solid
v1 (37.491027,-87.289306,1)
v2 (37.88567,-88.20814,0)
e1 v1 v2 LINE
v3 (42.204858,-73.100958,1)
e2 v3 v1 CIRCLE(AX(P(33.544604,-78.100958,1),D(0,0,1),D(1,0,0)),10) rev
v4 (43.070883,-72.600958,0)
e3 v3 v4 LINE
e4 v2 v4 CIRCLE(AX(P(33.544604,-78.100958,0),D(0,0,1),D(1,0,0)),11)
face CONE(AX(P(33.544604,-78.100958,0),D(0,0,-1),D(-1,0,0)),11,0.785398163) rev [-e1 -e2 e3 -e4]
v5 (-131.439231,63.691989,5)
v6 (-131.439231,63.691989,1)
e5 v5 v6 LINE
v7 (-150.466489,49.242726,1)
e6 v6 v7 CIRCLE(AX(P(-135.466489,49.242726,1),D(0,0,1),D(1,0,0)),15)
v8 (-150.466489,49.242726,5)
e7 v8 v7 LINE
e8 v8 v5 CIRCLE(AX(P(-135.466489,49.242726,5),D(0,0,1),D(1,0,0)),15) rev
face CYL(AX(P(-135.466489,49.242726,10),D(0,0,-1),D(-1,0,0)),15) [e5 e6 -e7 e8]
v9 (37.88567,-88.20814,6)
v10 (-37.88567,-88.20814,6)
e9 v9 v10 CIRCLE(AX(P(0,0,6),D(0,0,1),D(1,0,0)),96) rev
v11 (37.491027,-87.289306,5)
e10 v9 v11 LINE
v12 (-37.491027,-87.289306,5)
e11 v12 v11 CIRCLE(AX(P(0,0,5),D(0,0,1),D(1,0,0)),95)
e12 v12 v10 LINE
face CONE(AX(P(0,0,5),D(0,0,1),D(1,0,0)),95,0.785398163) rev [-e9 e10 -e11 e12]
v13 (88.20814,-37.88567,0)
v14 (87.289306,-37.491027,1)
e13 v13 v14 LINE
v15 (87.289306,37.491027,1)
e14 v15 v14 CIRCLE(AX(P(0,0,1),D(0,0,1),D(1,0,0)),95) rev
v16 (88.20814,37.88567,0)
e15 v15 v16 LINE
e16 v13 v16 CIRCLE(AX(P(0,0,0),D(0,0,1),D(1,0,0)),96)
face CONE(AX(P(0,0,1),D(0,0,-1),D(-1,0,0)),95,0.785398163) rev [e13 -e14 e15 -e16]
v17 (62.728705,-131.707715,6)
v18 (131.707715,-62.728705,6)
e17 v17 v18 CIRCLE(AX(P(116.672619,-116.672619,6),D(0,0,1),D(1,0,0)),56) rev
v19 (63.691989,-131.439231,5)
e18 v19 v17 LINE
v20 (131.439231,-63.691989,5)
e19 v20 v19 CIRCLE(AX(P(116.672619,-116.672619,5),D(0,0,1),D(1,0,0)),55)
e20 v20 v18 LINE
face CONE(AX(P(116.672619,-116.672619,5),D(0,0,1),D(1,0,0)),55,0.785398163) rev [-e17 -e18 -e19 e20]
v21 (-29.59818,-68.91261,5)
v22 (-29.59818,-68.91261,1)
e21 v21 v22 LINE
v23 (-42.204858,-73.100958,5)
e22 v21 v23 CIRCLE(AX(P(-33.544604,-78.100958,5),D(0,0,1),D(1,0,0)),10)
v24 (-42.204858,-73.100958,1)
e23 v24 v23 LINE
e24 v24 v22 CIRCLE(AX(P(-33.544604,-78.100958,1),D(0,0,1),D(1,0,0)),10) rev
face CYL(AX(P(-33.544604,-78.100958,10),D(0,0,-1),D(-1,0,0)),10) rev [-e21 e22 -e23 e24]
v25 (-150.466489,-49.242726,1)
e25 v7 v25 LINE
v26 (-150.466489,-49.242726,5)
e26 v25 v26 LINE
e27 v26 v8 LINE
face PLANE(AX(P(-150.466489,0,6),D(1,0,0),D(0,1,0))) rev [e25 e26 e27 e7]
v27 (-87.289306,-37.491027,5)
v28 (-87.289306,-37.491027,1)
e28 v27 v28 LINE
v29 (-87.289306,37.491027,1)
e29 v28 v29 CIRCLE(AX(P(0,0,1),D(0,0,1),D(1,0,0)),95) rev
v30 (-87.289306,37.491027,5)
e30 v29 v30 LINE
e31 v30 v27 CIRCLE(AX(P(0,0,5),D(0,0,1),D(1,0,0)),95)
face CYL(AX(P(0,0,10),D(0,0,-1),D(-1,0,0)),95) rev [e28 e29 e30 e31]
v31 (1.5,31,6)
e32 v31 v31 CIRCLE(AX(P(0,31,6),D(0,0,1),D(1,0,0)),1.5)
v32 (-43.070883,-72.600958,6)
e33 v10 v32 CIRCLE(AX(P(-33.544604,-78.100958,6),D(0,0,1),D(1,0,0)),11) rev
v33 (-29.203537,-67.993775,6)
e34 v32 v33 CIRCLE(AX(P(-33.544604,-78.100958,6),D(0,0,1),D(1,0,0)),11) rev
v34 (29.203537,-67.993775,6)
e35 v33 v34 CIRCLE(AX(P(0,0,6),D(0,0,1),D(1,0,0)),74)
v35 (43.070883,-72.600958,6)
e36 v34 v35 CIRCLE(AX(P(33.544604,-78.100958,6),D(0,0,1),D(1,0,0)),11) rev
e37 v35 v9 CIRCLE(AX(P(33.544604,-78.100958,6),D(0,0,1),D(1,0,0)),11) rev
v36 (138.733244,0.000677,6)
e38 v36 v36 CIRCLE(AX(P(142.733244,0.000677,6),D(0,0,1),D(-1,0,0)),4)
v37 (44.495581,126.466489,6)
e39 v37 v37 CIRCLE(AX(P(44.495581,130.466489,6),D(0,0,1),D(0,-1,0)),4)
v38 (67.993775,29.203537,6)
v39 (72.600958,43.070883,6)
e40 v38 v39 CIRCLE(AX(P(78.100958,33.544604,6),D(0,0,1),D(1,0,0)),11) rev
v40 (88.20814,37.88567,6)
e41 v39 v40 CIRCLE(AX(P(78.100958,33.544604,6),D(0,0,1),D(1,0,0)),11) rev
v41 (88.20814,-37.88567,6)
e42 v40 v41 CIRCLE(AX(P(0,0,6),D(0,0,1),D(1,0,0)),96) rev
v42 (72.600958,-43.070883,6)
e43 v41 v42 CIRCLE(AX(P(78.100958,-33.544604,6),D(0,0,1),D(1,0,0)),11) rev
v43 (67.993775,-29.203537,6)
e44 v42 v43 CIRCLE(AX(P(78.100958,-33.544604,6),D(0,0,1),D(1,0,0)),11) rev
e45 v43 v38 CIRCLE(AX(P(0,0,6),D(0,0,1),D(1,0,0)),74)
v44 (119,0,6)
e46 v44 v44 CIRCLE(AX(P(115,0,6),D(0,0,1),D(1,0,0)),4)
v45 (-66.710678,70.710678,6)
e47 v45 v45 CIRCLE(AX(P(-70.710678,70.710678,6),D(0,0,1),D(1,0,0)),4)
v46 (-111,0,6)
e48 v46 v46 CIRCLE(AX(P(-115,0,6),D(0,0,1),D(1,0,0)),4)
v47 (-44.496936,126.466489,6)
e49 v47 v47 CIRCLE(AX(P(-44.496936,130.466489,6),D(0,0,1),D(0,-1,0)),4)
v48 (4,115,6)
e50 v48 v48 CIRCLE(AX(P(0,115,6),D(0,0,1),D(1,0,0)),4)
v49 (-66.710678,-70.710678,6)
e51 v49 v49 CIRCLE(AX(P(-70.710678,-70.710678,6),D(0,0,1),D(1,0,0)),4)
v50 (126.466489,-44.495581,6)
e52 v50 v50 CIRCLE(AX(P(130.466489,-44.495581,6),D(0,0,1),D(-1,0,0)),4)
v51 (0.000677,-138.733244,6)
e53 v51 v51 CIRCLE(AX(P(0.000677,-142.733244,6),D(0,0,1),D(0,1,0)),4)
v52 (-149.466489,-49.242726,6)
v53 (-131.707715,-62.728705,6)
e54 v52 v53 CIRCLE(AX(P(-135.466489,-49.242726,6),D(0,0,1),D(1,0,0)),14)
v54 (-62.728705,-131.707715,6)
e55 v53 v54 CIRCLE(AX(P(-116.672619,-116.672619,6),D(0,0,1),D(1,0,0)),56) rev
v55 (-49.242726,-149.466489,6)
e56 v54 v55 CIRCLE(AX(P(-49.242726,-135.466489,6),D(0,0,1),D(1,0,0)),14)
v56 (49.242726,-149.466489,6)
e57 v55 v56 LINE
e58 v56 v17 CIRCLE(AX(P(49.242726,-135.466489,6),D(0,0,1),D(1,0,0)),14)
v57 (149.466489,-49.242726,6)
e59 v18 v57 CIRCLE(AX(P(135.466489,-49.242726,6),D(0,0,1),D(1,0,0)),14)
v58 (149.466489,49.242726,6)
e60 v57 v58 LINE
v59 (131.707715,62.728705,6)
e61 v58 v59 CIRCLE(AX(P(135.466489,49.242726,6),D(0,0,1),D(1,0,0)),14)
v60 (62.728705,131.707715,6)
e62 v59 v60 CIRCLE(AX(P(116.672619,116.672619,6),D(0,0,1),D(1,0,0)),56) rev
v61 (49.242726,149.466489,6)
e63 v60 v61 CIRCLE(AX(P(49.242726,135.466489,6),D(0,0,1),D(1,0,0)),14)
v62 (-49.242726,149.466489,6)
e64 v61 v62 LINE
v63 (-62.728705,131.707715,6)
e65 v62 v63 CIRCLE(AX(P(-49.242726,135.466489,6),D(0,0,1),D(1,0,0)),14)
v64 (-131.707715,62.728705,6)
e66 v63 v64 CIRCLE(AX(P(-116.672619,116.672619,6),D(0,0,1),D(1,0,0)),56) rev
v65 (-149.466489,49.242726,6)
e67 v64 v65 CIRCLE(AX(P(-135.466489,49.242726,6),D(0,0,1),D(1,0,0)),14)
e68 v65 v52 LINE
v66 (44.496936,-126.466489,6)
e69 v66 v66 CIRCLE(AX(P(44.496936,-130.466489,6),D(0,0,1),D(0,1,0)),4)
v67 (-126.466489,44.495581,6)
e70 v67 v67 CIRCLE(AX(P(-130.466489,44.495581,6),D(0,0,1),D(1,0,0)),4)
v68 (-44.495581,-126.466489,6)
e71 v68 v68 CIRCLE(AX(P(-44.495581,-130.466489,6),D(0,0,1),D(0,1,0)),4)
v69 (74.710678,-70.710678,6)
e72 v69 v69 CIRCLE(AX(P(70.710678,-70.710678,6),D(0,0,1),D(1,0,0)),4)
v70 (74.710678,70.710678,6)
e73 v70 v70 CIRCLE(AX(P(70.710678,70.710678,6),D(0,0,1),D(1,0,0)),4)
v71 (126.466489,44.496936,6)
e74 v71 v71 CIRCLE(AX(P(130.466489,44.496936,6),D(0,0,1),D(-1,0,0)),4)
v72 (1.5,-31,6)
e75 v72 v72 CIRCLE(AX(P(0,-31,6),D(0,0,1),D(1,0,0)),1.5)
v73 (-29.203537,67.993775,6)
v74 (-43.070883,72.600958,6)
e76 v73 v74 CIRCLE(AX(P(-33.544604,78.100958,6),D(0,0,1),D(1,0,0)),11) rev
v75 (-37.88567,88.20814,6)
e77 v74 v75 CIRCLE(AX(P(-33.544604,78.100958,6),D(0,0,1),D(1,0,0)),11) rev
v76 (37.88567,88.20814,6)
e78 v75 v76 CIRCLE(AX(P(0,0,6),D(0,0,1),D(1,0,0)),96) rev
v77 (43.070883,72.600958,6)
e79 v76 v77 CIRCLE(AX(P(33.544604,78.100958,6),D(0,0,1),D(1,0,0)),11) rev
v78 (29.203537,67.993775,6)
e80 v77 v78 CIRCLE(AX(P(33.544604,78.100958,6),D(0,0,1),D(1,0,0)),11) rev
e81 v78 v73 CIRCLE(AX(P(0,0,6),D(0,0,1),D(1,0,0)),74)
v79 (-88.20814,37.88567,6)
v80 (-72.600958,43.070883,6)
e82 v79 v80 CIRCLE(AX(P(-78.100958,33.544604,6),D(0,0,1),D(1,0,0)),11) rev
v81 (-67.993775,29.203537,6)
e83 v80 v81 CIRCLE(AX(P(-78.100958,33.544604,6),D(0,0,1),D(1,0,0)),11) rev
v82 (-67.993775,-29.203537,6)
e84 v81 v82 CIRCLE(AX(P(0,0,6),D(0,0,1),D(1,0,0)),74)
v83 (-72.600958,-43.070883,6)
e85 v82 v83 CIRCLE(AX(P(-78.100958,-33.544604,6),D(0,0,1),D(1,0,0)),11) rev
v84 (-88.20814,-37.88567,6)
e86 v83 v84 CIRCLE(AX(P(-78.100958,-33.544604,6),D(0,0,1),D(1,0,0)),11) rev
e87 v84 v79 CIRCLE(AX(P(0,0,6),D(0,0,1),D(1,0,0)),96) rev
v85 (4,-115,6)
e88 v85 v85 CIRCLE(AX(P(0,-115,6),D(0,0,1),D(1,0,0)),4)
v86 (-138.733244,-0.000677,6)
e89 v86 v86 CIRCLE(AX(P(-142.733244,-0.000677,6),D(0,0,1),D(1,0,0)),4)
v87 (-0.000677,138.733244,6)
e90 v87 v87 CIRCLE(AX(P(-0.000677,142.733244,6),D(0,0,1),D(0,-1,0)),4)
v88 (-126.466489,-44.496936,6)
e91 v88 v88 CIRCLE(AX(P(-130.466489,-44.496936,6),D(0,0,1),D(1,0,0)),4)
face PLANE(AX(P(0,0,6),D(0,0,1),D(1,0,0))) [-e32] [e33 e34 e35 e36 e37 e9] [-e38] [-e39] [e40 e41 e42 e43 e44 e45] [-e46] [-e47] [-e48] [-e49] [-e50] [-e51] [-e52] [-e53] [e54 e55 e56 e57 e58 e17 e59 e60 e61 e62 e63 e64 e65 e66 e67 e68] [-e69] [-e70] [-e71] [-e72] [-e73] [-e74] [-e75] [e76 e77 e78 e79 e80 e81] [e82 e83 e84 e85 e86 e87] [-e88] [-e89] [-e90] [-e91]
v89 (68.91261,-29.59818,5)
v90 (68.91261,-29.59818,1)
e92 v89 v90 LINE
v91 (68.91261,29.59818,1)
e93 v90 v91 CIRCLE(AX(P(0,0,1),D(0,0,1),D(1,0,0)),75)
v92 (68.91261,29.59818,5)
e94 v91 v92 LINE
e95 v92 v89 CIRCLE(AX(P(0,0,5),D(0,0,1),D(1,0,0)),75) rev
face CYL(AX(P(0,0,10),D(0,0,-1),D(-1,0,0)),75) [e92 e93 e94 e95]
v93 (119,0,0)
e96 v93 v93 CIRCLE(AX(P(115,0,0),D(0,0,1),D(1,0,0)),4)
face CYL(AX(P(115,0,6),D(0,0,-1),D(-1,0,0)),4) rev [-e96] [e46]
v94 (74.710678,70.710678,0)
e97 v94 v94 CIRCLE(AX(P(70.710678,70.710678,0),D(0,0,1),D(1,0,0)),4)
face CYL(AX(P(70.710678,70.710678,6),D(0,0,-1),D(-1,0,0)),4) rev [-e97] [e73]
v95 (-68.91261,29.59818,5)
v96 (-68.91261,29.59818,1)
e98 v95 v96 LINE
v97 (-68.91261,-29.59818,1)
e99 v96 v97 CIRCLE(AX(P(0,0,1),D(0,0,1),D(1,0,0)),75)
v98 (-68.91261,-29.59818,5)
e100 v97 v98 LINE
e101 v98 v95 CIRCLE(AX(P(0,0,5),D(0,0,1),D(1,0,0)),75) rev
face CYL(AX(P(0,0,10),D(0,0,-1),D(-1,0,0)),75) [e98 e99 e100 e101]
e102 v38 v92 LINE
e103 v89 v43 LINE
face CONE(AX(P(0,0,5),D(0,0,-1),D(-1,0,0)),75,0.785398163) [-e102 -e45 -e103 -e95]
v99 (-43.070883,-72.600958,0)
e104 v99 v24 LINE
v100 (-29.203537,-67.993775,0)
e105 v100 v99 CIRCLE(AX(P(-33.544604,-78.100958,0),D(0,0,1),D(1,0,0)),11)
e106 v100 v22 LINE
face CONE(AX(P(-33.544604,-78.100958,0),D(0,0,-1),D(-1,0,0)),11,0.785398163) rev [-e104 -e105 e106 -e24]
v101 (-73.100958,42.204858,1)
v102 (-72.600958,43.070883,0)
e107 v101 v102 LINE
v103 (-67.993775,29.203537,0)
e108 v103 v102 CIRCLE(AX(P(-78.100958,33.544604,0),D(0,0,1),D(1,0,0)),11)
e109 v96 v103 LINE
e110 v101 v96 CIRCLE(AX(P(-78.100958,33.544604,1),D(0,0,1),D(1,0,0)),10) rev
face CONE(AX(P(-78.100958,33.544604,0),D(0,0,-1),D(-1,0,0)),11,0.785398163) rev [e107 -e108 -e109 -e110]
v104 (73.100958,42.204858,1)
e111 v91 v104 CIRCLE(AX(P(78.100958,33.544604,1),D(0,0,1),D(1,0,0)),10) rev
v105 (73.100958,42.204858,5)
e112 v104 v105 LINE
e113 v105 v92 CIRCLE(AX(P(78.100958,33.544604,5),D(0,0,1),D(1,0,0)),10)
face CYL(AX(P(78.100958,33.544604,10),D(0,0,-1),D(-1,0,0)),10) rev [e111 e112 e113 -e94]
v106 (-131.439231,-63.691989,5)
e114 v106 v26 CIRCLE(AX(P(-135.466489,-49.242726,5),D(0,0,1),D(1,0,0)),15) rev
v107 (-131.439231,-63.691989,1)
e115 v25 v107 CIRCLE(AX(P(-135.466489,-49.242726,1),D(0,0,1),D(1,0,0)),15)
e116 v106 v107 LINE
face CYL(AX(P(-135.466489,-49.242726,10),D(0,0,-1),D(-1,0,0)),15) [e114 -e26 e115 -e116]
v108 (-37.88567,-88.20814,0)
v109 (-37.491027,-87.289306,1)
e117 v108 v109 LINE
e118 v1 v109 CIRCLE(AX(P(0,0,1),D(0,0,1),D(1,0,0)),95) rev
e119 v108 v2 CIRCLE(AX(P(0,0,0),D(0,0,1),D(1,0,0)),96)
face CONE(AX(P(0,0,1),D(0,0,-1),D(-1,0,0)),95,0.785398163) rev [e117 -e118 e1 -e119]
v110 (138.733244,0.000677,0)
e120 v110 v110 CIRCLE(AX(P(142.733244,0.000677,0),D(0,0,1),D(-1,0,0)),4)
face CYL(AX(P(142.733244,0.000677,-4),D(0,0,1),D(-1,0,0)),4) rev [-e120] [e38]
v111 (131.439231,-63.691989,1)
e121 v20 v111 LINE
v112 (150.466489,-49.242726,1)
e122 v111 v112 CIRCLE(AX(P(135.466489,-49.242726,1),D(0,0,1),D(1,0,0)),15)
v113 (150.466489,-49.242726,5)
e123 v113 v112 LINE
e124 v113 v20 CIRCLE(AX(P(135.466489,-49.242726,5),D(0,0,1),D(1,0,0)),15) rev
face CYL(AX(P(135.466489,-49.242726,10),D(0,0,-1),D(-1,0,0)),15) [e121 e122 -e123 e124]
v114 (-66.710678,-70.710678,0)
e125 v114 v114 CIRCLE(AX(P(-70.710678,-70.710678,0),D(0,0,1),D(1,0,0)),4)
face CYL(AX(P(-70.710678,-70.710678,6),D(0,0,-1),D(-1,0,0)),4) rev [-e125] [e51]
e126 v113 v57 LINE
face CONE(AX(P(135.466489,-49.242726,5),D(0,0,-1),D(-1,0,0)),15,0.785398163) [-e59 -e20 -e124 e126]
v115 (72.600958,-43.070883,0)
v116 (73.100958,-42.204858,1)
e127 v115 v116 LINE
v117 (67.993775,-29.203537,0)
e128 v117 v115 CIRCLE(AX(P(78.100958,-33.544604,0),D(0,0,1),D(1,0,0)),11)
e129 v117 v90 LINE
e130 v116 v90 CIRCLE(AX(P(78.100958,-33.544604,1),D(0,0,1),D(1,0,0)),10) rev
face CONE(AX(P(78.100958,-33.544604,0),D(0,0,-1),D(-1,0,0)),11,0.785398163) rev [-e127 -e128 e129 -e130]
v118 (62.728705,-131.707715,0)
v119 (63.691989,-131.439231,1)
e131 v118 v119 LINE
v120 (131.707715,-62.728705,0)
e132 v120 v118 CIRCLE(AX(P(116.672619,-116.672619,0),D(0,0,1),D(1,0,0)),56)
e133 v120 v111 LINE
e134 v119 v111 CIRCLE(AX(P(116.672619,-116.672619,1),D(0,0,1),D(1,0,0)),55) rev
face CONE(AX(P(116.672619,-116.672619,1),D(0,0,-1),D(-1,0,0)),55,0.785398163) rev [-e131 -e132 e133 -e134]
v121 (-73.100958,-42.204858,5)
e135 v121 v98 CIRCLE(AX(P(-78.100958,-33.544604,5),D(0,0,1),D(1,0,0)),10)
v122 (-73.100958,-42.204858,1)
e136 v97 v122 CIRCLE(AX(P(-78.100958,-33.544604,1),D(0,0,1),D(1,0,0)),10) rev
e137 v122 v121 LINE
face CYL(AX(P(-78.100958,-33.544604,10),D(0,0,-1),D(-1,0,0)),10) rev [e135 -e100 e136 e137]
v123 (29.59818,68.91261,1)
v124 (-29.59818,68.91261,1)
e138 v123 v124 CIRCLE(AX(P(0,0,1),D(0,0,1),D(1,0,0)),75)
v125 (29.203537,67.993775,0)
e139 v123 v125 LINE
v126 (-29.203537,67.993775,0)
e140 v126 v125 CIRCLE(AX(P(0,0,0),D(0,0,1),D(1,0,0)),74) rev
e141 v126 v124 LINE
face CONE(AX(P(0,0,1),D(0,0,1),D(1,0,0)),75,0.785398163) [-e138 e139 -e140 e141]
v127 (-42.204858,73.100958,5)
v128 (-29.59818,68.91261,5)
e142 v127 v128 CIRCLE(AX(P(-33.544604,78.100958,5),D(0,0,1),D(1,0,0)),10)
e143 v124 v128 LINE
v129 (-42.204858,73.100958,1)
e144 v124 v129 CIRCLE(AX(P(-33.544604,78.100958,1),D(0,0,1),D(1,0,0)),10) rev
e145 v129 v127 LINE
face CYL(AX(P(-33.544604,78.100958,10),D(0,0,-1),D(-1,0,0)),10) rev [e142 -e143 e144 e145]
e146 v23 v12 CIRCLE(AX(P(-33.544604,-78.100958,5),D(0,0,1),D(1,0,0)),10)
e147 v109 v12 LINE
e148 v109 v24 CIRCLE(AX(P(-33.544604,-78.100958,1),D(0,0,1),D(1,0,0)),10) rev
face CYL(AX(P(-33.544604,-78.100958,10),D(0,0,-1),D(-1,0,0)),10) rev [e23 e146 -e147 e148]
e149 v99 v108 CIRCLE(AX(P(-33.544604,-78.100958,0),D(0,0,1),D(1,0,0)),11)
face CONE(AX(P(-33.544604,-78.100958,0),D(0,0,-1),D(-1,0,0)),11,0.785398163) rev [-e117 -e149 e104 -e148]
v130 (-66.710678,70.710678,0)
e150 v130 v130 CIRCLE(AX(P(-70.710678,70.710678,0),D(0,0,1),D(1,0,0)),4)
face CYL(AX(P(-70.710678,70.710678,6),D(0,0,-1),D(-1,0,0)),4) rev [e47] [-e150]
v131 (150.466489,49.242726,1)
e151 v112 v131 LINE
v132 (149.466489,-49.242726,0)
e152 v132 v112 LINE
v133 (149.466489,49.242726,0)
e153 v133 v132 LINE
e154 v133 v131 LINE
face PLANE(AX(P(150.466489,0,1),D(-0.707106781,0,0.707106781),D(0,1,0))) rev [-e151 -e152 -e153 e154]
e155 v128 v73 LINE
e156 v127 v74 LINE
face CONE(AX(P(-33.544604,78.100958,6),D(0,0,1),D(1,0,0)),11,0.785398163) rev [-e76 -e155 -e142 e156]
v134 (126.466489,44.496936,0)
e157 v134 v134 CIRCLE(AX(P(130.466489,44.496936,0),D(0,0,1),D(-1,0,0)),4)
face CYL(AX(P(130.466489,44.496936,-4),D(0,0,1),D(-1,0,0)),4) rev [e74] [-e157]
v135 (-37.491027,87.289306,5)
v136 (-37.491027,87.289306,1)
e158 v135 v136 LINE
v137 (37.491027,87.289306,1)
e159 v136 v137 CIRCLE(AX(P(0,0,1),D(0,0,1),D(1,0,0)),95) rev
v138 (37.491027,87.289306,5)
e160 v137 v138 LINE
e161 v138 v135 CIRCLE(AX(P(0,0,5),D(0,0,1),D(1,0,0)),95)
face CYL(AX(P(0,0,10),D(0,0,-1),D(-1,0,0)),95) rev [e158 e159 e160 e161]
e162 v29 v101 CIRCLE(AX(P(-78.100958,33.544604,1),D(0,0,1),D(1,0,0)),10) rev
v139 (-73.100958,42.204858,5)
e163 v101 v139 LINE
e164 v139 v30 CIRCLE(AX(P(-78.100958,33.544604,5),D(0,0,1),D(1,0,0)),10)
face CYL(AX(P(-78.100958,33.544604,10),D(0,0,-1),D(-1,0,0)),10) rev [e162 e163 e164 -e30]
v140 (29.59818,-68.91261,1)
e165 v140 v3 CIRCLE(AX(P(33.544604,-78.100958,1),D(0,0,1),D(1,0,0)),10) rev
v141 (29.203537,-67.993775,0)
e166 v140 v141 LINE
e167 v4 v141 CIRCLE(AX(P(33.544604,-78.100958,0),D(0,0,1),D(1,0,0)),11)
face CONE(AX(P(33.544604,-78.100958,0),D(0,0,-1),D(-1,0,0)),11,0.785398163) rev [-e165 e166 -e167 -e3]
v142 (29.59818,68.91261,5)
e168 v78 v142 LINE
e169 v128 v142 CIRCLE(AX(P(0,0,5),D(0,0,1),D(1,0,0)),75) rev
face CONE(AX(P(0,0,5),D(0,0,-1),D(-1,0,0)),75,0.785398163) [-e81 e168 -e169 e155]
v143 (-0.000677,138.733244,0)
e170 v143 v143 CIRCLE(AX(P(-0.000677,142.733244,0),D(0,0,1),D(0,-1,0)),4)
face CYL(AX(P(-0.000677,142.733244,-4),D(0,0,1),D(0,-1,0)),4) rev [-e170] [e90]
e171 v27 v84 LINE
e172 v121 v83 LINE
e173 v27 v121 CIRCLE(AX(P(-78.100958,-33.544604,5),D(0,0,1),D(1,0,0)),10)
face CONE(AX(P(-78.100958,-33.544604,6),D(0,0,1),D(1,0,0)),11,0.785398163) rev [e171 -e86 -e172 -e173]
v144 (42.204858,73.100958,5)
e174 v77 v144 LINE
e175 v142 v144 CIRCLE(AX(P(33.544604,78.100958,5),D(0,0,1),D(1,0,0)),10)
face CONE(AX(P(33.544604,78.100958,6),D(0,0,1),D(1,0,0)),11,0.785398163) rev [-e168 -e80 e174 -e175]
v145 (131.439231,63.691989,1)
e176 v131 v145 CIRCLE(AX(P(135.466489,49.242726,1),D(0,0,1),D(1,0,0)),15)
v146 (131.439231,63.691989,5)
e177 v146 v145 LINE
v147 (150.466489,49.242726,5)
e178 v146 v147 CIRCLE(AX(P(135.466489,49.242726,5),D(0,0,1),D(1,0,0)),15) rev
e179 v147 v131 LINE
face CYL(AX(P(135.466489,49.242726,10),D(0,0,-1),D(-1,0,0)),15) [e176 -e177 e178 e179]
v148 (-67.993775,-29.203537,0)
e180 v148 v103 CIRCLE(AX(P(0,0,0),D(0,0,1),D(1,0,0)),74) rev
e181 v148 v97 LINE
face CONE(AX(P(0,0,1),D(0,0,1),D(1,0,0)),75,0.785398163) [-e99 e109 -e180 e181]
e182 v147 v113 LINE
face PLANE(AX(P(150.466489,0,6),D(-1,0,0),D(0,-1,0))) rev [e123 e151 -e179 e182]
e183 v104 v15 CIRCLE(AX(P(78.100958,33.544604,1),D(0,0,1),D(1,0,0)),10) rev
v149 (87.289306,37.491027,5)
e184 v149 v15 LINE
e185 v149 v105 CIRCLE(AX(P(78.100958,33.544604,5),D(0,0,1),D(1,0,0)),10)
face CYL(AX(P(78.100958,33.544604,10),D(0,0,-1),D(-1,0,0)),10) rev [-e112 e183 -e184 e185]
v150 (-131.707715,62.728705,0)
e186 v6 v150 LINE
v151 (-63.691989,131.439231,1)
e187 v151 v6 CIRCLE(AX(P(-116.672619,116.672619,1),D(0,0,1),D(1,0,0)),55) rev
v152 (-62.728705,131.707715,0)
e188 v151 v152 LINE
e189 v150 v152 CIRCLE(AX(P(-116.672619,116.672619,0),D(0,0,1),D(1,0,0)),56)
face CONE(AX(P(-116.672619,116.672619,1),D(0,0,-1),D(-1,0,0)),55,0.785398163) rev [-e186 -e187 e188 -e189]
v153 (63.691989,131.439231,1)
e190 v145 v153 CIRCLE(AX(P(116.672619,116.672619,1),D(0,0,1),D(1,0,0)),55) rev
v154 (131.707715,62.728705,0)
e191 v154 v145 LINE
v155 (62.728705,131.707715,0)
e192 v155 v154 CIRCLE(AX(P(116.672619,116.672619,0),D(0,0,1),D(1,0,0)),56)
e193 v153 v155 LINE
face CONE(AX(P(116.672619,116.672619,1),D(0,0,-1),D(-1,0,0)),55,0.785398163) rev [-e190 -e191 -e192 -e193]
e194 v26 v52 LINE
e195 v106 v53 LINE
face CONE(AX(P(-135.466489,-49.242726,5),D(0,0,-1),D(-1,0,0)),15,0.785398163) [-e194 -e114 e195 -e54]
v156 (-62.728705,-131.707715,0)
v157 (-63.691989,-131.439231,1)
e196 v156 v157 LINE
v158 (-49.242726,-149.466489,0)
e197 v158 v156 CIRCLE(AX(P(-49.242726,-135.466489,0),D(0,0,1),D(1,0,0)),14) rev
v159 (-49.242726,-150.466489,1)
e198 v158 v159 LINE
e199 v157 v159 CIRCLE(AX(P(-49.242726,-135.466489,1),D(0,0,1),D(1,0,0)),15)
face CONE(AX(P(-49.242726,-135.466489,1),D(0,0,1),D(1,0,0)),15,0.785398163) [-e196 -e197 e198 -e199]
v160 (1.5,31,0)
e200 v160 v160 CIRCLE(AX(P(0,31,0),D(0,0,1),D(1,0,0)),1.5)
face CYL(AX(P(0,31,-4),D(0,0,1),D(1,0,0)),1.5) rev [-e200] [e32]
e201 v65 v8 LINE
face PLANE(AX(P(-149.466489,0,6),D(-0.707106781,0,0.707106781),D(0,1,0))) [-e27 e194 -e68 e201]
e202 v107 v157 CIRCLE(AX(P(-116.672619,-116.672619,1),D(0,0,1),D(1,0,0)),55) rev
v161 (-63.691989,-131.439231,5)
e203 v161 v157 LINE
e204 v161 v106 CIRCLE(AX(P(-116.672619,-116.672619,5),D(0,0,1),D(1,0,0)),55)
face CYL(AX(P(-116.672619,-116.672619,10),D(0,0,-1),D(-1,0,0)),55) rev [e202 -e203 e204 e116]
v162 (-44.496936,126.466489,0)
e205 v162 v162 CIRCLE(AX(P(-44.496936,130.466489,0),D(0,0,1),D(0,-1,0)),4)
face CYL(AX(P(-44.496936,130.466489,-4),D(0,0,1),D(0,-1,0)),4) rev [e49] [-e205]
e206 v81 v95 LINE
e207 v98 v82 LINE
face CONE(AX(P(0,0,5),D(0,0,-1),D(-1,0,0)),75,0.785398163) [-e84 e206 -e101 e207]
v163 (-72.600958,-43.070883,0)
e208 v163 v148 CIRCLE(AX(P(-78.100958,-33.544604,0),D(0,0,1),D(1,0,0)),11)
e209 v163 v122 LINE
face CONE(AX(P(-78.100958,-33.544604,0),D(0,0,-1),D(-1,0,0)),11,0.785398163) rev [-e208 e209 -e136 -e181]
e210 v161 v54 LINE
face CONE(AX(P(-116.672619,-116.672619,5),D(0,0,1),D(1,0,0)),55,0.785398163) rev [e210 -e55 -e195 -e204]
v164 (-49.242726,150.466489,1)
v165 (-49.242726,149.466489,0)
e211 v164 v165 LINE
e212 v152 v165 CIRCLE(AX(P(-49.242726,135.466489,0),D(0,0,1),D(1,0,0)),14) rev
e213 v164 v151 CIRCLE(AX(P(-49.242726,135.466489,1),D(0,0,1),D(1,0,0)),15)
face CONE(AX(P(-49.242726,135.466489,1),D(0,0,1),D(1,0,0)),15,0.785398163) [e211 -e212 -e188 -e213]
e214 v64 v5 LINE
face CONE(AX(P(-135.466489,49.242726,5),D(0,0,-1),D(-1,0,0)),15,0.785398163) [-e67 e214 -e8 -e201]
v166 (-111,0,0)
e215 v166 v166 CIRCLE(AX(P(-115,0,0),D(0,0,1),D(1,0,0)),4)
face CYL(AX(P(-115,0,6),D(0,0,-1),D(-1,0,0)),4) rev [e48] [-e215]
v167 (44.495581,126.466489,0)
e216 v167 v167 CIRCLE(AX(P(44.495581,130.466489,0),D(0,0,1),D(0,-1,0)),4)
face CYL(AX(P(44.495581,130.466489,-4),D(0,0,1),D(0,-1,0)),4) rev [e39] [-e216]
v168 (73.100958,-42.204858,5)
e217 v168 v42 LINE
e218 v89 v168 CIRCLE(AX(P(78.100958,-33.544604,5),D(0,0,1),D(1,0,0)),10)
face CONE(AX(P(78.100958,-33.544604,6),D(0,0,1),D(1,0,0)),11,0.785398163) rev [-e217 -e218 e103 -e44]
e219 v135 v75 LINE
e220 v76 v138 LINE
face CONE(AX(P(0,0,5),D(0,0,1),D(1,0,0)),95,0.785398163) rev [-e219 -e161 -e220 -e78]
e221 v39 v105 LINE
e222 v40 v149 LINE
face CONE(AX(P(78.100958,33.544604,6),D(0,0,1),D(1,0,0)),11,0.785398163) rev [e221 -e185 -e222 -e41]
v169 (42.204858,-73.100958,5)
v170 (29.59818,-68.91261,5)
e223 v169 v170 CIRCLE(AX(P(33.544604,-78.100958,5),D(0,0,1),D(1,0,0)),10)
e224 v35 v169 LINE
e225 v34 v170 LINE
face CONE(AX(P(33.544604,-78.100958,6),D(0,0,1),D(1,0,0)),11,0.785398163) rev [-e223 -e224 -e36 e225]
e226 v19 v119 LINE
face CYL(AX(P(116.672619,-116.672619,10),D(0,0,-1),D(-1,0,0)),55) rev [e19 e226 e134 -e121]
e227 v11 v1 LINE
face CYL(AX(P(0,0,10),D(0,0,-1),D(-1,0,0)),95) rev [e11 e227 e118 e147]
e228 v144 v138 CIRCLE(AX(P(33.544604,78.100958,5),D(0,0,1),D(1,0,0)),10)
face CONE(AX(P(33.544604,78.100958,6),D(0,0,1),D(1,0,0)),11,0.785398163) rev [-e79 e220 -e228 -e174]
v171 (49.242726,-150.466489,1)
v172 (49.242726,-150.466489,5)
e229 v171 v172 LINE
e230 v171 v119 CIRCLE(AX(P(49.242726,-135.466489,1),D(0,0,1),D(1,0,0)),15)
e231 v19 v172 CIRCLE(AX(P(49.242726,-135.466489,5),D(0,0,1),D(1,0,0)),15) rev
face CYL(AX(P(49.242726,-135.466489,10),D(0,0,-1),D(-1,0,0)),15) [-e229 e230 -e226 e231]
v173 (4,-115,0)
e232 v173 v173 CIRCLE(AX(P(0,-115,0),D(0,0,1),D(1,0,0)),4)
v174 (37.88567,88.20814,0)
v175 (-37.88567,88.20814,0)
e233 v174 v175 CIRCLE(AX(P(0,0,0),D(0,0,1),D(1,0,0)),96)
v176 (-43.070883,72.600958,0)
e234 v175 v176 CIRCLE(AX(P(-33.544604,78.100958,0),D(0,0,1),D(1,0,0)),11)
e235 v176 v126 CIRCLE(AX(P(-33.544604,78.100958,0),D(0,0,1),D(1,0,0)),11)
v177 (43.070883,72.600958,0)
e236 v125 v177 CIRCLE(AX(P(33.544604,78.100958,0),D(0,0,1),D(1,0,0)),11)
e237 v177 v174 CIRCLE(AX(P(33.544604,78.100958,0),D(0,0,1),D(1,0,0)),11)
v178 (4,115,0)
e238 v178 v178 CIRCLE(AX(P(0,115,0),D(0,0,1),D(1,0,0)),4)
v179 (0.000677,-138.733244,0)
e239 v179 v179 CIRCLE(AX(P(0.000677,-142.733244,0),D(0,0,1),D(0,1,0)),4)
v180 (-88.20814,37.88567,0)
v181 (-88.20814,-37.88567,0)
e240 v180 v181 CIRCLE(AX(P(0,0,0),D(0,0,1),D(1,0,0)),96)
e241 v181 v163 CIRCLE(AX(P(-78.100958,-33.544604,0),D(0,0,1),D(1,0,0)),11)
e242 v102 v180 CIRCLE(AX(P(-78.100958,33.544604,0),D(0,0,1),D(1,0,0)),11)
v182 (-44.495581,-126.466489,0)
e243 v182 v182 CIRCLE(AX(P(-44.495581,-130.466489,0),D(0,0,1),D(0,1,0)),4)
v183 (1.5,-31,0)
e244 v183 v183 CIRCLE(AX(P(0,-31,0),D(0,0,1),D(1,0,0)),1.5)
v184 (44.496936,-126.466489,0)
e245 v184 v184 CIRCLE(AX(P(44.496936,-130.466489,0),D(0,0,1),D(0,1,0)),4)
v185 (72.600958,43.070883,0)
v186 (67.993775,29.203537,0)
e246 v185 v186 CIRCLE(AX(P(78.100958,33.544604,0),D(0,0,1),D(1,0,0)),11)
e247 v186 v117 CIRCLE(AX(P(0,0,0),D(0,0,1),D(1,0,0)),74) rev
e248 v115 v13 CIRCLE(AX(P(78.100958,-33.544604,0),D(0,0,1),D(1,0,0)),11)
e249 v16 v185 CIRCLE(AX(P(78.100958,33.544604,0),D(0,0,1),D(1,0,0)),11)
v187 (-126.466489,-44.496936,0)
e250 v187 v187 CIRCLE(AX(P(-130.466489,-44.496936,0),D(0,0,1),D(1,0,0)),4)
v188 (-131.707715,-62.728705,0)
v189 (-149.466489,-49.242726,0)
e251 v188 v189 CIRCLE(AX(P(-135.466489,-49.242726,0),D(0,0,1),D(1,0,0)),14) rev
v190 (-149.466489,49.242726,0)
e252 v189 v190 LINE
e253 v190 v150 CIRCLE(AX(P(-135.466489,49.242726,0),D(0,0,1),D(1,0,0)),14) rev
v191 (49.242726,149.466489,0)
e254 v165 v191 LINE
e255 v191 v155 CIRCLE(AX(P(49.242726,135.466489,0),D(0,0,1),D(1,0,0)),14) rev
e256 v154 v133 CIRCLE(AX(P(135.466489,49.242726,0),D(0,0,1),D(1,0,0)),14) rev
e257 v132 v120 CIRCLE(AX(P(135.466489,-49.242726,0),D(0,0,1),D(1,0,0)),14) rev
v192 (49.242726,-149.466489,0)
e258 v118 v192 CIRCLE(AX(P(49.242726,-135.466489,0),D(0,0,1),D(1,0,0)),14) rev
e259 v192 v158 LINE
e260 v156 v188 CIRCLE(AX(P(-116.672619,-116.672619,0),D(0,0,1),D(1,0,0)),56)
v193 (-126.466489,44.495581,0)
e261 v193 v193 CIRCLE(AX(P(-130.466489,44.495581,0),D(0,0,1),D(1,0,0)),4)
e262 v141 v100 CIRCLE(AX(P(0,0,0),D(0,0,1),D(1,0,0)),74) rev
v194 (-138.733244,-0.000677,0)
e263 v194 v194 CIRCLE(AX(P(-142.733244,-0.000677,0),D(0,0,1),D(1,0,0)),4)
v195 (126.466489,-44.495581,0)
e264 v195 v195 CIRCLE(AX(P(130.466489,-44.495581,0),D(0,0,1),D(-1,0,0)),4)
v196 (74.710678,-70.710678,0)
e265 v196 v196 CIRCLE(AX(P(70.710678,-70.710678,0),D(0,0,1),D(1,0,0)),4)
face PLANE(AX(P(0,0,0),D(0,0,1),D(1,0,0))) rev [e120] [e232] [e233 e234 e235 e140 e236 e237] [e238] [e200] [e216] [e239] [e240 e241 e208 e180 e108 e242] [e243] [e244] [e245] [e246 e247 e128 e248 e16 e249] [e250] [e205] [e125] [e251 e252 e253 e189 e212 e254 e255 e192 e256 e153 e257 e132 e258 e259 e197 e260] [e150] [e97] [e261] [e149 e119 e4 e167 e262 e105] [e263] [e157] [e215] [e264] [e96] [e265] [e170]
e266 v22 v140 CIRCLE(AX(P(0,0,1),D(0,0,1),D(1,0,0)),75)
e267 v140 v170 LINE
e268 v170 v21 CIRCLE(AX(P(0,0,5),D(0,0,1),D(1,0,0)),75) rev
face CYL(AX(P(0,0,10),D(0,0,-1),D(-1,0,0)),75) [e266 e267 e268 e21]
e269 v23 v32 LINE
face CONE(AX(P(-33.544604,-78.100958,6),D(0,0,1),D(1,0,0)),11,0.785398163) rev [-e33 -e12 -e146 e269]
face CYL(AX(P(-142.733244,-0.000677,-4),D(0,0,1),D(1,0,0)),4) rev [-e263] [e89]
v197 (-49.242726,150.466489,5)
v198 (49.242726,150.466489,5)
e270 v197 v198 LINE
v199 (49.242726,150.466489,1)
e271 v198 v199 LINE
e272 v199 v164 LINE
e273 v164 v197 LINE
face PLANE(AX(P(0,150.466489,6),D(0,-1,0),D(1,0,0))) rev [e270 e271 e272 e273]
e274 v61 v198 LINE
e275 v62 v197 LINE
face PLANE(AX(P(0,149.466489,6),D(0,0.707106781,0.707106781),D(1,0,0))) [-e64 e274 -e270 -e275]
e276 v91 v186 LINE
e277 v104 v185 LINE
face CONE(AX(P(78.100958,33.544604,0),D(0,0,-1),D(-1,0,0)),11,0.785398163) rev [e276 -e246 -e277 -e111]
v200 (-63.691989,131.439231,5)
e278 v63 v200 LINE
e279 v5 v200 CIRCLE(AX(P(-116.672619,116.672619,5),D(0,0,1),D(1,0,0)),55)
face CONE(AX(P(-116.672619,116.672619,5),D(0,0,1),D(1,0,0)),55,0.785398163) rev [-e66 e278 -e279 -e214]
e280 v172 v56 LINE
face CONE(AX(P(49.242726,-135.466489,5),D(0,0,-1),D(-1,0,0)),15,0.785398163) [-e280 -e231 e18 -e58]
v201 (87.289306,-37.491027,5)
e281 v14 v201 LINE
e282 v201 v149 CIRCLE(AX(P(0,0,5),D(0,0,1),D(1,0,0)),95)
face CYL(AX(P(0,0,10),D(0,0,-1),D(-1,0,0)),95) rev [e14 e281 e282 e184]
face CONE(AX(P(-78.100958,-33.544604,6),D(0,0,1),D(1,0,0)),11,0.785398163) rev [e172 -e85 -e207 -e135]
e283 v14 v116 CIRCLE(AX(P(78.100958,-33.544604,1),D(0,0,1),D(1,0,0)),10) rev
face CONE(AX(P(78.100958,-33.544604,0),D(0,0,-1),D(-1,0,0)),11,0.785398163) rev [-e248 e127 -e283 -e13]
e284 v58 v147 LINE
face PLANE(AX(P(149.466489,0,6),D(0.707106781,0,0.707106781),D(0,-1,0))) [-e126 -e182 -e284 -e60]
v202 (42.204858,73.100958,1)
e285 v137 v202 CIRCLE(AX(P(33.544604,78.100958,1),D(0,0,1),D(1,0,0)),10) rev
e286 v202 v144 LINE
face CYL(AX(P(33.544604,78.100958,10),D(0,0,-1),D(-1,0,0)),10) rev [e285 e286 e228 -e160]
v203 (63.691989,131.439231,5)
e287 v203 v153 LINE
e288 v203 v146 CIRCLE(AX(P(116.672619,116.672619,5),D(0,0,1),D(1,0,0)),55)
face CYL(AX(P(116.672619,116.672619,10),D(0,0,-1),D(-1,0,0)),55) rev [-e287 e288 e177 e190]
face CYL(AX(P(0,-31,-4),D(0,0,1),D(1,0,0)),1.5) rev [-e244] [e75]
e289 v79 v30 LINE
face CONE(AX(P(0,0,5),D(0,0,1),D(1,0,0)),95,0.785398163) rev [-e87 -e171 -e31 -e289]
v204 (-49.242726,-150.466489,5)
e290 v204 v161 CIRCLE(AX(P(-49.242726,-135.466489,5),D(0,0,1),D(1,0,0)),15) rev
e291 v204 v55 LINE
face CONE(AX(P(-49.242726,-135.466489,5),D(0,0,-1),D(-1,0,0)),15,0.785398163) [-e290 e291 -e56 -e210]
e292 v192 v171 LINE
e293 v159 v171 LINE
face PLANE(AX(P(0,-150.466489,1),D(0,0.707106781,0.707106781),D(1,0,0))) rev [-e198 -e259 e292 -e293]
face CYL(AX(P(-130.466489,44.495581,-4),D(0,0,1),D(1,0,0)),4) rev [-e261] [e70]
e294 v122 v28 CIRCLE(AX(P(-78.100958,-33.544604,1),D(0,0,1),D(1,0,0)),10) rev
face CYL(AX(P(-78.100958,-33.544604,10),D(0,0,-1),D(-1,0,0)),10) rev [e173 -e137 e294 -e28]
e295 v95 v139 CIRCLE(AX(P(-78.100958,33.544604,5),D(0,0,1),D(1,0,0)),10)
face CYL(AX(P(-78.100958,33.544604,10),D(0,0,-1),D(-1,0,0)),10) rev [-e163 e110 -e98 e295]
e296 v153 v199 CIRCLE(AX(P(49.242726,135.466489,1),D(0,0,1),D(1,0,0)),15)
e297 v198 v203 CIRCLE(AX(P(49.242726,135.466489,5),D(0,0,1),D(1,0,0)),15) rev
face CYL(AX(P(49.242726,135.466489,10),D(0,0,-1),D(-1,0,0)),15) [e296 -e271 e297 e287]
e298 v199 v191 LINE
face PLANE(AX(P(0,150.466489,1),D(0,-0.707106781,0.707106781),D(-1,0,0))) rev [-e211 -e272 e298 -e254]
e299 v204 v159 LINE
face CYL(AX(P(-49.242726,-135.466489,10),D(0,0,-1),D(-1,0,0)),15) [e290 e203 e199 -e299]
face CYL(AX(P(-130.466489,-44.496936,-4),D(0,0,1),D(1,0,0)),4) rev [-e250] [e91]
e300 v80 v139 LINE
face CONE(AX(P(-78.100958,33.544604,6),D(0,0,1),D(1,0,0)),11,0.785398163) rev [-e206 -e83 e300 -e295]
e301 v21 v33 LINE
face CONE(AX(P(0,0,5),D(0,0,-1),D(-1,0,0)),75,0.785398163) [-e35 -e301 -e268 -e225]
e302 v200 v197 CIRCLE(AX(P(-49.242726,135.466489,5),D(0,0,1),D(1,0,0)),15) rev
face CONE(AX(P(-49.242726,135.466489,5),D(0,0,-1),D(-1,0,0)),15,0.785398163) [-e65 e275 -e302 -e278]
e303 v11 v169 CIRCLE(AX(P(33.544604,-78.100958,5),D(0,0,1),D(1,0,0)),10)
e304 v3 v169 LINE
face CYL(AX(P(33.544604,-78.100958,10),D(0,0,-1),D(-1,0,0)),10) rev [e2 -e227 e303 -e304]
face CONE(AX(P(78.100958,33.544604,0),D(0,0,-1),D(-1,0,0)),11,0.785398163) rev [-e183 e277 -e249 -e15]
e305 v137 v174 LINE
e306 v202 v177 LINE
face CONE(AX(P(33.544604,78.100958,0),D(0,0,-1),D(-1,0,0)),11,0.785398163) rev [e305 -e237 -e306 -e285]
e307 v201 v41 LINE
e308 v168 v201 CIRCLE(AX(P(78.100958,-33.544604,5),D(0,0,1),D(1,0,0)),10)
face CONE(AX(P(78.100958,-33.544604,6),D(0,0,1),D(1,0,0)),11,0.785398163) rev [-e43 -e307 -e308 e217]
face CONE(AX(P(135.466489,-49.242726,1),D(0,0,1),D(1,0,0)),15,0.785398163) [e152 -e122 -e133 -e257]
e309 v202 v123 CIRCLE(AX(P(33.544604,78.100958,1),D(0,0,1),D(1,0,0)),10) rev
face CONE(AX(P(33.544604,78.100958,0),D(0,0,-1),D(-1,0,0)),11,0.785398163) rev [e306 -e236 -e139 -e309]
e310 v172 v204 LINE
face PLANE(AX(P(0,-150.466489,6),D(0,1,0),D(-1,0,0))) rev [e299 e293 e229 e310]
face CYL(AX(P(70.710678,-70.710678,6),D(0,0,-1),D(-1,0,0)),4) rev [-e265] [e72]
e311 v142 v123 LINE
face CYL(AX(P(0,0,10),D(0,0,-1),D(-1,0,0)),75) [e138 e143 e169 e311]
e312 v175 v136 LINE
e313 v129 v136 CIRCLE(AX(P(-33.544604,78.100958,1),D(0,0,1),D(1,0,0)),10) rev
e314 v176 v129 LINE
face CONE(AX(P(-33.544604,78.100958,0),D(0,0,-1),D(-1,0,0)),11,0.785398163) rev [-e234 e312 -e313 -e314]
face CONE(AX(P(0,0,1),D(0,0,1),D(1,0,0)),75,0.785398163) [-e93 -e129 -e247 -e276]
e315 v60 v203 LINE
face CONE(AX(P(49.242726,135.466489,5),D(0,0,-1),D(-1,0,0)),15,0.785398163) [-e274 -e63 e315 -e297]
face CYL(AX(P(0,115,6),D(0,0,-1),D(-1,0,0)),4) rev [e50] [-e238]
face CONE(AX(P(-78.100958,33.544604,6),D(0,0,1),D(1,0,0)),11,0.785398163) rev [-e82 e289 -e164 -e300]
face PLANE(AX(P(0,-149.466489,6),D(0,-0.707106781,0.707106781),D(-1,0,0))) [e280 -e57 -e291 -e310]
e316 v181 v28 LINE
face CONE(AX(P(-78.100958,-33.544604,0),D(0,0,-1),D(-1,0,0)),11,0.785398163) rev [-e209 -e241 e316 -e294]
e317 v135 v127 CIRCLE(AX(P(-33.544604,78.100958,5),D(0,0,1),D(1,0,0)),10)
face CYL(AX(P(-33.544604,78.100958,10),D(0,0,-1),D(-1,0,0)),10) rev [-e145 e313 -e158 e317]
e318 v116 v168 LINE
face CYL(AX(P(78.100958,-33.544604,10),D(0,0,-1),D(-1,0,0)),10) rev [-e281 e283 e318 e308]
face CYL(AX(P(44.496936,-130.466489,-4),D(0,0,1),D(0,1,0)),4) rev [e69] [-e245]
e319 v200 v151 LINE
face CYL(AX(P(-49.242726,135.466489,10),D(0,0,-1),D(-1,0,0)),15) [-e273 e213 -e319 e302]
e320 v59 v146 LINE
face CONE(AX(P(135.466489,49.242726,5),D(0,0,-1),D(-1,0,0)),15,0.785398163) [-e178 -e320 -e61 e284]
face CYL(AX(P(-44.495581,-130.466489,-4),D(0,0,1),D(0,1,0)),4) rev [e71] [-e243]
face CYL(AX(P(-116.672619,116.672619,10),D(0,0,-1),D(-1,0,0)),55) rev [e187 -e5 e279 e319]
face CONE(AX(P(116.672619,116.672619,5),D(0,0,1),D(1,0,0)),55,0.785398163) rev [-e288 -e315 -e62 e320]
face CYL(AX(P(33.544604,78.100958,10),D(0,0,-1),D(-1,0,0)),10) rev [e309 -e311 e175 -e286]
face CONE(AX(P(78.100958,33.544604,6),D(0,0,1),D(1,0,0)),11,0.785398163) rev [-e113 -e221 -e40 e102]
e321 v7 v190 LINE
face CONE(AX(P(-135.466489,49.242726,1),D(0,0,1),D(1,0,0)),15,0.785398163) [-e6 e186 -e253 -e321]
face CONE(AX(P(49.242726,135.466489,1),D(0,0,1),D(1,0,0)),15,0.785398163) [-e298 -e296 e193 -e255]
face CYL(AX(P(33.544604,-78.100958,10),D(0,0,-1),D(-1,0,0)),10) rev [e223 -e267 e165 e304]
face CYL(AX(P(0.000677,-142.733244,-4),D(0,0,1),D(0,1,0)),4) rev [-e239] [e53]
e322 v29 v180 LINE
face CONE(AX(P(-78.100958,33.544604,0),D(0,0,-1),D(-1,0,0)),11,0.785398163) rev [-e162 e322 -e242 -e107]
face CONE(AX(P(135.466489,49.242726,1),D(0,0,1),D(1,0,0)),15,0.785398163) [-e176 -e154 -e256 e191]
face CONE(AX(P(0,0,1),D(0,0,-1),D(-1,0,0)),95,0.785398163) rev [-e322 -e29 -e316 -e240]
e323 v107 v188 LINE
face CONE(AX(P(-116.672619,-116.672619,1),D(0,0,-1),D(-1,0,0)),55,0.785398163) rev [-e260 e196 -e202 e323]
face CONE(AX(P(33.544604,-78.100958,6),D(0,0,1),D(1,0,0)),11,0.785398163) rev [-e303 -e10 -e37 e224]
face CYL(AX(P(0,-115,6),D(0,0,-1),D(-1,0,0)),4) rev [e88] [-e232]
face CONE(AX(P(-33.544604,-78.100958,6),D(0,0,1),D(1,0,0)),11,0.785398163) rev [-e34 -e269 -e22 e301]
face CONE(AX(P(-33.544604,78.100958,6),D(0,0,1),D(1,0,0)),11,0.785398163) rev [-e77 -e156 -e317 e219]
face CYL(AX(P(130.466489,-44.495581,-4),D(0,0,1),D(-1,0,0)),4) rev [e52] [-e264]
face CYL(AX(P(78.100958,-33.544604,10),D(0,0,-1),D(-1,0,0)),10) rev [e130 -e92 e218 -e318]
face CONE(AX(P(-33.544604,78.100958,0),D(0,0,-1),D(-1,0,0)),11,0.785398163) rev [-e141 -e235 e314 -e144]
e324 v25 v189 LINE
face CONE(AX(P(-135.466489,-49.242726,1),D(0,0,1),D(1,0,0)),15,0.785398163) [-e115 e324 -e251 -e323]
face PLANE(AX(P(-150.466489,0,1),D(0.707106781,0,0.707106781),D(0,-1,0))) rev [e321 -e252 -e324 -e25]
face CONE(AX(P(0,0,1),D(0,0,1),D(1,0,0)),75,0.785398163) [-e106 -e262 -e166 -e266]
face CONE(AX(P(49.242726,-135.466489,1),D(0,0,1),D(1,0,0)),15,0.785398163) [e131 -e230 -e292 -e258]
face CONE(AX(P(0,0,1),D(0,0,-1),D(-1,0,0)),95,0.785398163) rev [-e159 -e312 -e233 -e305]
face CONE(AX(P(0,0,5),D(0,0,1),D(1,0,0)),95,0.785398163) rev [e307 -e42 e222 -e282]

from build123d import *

# Parameters (mm, degrees)
IZIM1_R                     = 4
Y_KSEKLIK_EKSTR_ZYON1_DEPTH = 6
RADYUS1_R                   = 5
IZIM2_R                     = 4
KES_EKSTR_ZYON1_DEPTH       = 10
DAIRESEL_KAPLAMA1_COUNT     = 4
SKETCH1_W                   = 170.605519564
SKETCH1_H                   = 25.837050878
CUT_EXTRUDE1_DEPTH          = 10
CIRPATTERN1_COUNT           = 4
FILLET1_R                   = 50
CUT_EXTRUDE2_DEPTH          = 10
CUT_EXTRUDE3_DEPTH          = 10
FILLET2_R                   = 10
CIRPATTERN3_COUNT           = 4
FILLET2_OF_CIRPATTERN3_R    = 10
CIRPATTERN2_COUNT           = 4
CHAMFER1_SIZE               = 1
SKETCH4_R                   = 1.5
CUT_EXTRUDE4_DEPTH          = 10


with BuildPart() as part:
    # Çizim1 → Yükseklik-Ekstrüzyon1 (new body)
    with BuildSketch(Plane.XY):
        with BuildLine():
            Line((-150.466489, 42), (-150.466489, -42))
            Line((-150.466489, -42), (-159.565033764, -42))
            ThreePointArc((-159.565033764, -42), (-116.672618896, -116.672618896), (-42, -159.565033764))
            Line((-42, -159.565033764), (-42, -150.466489))
            Line((-42, -150.466489), (42, -150.466489))
            Line((42, -150.466489), (42, -159.565033764))
            ThreePointArc((42, -159.565033764), (116.672618896, -116.672618896), (159.565033764, -42))
            Line((159.565033764, -42), (150.466489, -42))
            Line((150.466489, -42), (150.466489, 42))
            Line((150.466489, 42), (159.565033764, 42))
            ThreePointArc((159.565033764, 42), (116.672618896, 116.672618896), (42, 159.565033764))
            Line((42, 159.565033764), (42, 150.466489))
            Line((42, 150.466489), (-42, 150.466489))
            Line((-42, 150.466489), (-42, 159.565033764))
            ThreePointArc((-42, 159.565033764), (-116.672618896, 116.672618896), (-159.565033764, 42))
            Line((-159.565033764, 42), (-150.466489, 42))
        make_face()
        with Locations((0, 115)):
            Circle(IZIM1_R, mode=Mode.SUBTRACT)
        with Locations((115, 0)):
            Circle(IZIM1_R, mode=Mode.SUBTRACT)
        with Locations((0, -115)):
            Circle(IZIM1_R, mode=Mode.SUBTRACT)
        with Locations((-115, 0)):
            Circle(IZIM1_R, mode=Mode.SUBTRACT)
        with Locations((-70.710678119, 70.710678119)):
            Circle(IZIM1_R, mode=Mode.SUBTRACT)
        with Locations((70.710678119, 70.710678119)):
            Circle(IZIM1_R, mode=Mode.SUBTRACT)
        with Locations((70.710678119, -70.710678119)):
            Circle(IZIM1_R, mode=Mode.SUBTRACT)
        with Locations((-70.710678119, -70.710678119)):
            Circle(IZIM1_R, mode=Mode.SUBTRACT)
    extrude(amount=Y_KSEKLIK_EKSTR_ZYON1_DEPTH)

    # Radyus1
    radyus1_edges = [part.edges().sort_by_distance(p)[0] for p in [
        (159.565033764, -42, 3),
        (42, -159.565033764, 3),
        (-42, -159.565033764, 3),
        (-159.565033764, -42, 3),
        (-159.565033764, 42, 3),
        (-42, 159.565033764, 3),
        (42, 159.565033764, 3),
        (159.565033764, 42, 3),
    ]]
    fillet(radyus1_edges, radius=RADYUS1_R)

    # Çizim2 → Kes-Ekstrüzyon1 (cut)
    with BuildSketch(Plane.XY.offset(6)):
        with Locations((-130.466488641, -44.496935975)):
            Circle(IZIM2_R)
        with Locations((-142.73324432, -0.000677265)):
            Circle(IZIM2_R)
        with Locations((-130.466488641, 44.495581446)):
            Circle(IZIM2_R)
    kes_ekstr_zyon1 = extrude(amount=-KES_EKSTR_ZYON1_DEPTH, mode=Mode.SUBTRACT)

    # Dairesel Kaplama1: Kes-Ekstrüzyon1 ×4 about axis
    dairesel_kaplama1_axis = Axis((0, 0, 0), (0, 0, 1))
    for i in range(1, DAIRESEL_KAPLAMA1_COUNT):
        add(kes_ekstr_zyon1.rotate(dairesel_kaplama1_axis, i * 360 / DAIRESEL_KAPLAMA1_COUNT), mode=Mode.SUBTRACT)

    # Sketch1 → Cut-Extrude1 (cut)
    with BuildSketch(Plane(origin=(0, 0, 0), x_dir=(-1, 0, 0), z_dir=(0, 0, -1))):
        with Locations((0, 163.385014439)):
            Rectangle(SKETCH1_W, SKETCH1_H)
    cut_extrude1 = extrude(amount=-CUT_EXTRUDE1_DEPTH, mode=Mode.SUBTRACT)

    # CirPattern1: Cut-Extrude1 ×4 about axis
    cirpattern1_axis = Axis((0, 0, 0), (0, 0, 1))
    for i in range(1, CIRPATTERN1_COUNT):
        add(cut_extrude1.rotate(cirpattern1_axis, i * 360 / CIRPATTERN1_COUNT), mode=Mode.SUBTRACT)

    # Fillet1
    fillet1_edges = [part.edges().sort_by_distance(p)[0] for p in [
        (67.711414754, 150.466489, 3),
        (-67.711414754, 150.466489, 3),
        (-150.466489, 67.711414754, 3),
        (-150.466489, -67.711414754, 3),
        (-67.711414754, -150.466489, 3),
        (67.711414754, -150.466489, 3),
        (150.466489, 67.711414754, 3),
        (150.466489, -67.711414754, 3),
    ]]
    fillet(fillet1_edges, radius=FILLET1_R)

    # Sketch2 → Cut-Extrude2 (cut)
    with BuildSketch(Plane(origin=(0, 0, 0), x_dir=(-1, 0, 0), z_dir=(0, 0, -1))):
        with BuildLine():
            Line((-49.24272607, 150.466489), (-49.24272607, 163.848097422))
            Line((-49.24272607, 163.848097422), (-162.900639376, 163.848097422))
            Line((-162.900639376, 163.848097422), (-162.900639376, 49.24272607))
            Line((-162.900639376, 49.24272607), (-150.466489, 49.24272607))
            ThreePointArc((-150.466489, 49.24272607), (-144.538179355, 61.188622189), (-131.439231121, 63.691988818))
            ThreePointArc((-131.439231121, 63.691988818), (-77.781745931, 77.781745931), (-63.691988818, 131.439231121))
            ThreePointArc((-63.691988818, 131.439231121), (-61.188622189, 144.538179355), (-49.24272607, 150.466489))
        make_face()
    cut_extrude2 = extrude(amount=-CUT_EXTRUDE2_DEPTH, mode=Mode.SUBTRACT)

    # Sketch3 → Cut-Extrude3 (cut)
    with BuildSketch(Plane(origin=(0, 0, 0), x_dir=(-1, 0, 0), z_dir=(0, 0, -1))):
        with BuildLine():
            Line((-64.951905284, 37.5), (-82.27241336, 47.5))
            ThreePointArc((-82.27241336, 47.5), (-95, 0), (-82.27241336, -47.5))
            Line((-82.27241336, -47.5), (-64.951905284, -37.5))
            ThreePointArc((-64.951905284, -37.5), (-75, 0), (-64.951905284, 37.5))
        make_face()
    cut_extrude3 = extrude(amount=-CUT_EXTRUDE3_DEPTH, mode=Mode.SUBTRACT)

    # Fillet2
    fillet2_edges = [part.edges().sort_by_distance(p)[0] for p in [
        (82.27241336, -47.5, 3),
        (64.951905284, -37.5, 3),
        (64.951905284, 37.5, 3),
        (82.27241336, 47.5, 3),
    ]]
    fillet(fillet2_edges, radius=FILLET2_R - 0.0001)  # a hair under: the kernel refuses the full size

    # CirPattern3: Cut-Extrude3 ×4 about axis
    cirpattern3_axis = Axis((0, 0, 0), (0, 0, 1))
    for i in range(1, CIRPATTERN3_COUNT):
        add(cut_extrude3.rotate(cirpattern3_axis, i * 360 / CIRPATTERN3_COUNT), mode=Mode.SUBTRACT)

    # Fillet2 of CirPattern3
    fillet2_of_cirpattern3_edges = [part.edges().sort_by_distance(p)[0] for p in [
        (47.5, 82.27241336, 3),
        (37.5, 64.951905284, 3),
        (-37.5, 64.951905284, 3),
        (-47.5, 82.27241336, 3),
        (-82.27241336, 47.5, 3),
        (-64.951905284, 37.5, 3),
        (-64.951905284, -37.5, 3),
        (-82.27241336, -47.5, 3),
        (-47.5, -82.27241336, 3),
        (-37.5, -64.951905284, 3),
        (37.5, -64.951905284, 3),
        (47.5, -82.27241336, 3),
    ]]
    fillet(fillet2_of_cirpattern3_edges, radius=FILLET2_OF_CIRPATTERN3_R - 0.0001)  # a hair under: the kernel refuses the full size

    # CirPattern2: Cut-Extrude2 ×4 about axis
    cirpattern2_axis = Axis((0, 0, 0), (0, 0, 1))
    for i in range(1, CIRPATTERN2_COUNT):
        add(cut_extrude2.rotate(cirpattern2_axis, i * 360 / CIRPATTERN2_COUNT), mode=Mode.SUBTRACT)

    # Chamfer1
    chamfer1_edges = [part.edges().sort_by_distance(p)[0] for p in [
        (0, 150.466489, 0),
        (0, 150.466489, 6),
        (61.188622189, 144.538179355, 6),
        (77.781745931, 77.781745931, 6),
        (144.538179355, 61.188622189, 6),
        (144.538179355, 61.188622189, 0),
        (77.781745931, 77.781745931, 0),
        (61.188622189, 144.538179355, 0),
        (95, 0, 6),
        (95, 0, 0),
        (75, 0, 6),
        (75, 0, 0),
        (81.25384104, -43.03461599, 0),
        (81.25384104, -43.03461599, 6),
        (68.610961465, -36.697482988, 0),
        (68.610961465, -36.697482988, 6),
        (68.610961465, 36.697482988, 0),
        (68.610961465, 36.697482988, 6),
        (81.25384104, 43.03461599, 0),
        (81.25384104, 43.03461599, 6),
        (0, 95, 6),
        (0, 95, 0),
        (0, 75, 6),
        (0, 75, 0),
        (43.03461599, 81.25384104, 0),
        (43.03461599, 81.25384104, 6),
        (36.697482988, 68.610961465, 0),
        (36.697482988, 68.610961465, 6),
        (-36.697482988, 68.610961465, 0),
        (-36.697482988, 68.610961465, 6),
        (-43.03461599, 81.25384104, 0),
        (-43.03461599, 81.25384104, 6),
        (-95, 0, 6),
        (-95, 0, 0),
        (-75, 0, 6),
        (-75, 0, 0),
        (-81.25384104, 43.03461599, 0),
        (-81.25384104, 43.03461599, 6),
        (-68.610961465, 36.697482988, 0),
        (-68.610961465, 36.697482988, 6),
        (-68.610961465, -36.697482988, 0),
        (-68.610961465, -36.697482988, 6),
        (-81.25384104, -43.03461599, 0),
        (-81.25384104, -43.03461599, 6),
        (0, -95, 6),
        (0, -95, 0),
        (0, -75, 6),
        (0, -75, 0),
        (-43.03461599, -81.25384104, 0),
        (-43.03461599, -81.25384104, 6),
        (-36.697482988, -68.610961465, 0),
        (-36.697482988, -68.610961465, 6),
        (36.697482988, -68.610961465, 0),
        (36.697482988, -68.610961465, 6),
        (43.03461599, -81.25384104, 0),
        (43.03461599, -81.25384104, 6),
        (150.466489, 0, 0),
        (150.466489, 0, 6),
        (0, -150.466489, 0),
        (0, -150.466489, 6),
        (-150.466489, 0, 0),
        (-150.466489, 0, 6),
        (-77.781745931, 77.781745931, 6),
        (-61.188622189, 144.538179355, 6),
        (-144.538179355, 61.188622189, 6),
        (-61.188622189, 144.538179355, 0),
        (-77.781745931, 77.781745931, 0),
        (-144.538179355, 61.188622189, 0),
        (-77.781745931, -77.781745931, 6),
        (-144.538179355, -61.188622189, 6),
        (-61.188622189, -144.538179355, 6),
        (-144.538179355, -61.188622189, 0),
        (-77.781745931, -77.781745931, 0),
        (-61.188622189, -144.538179355, 0),
        (77.781745931, -77.781745931, 6),
        (61.188622189, -144.538179355, 6),
        (144.538179355, -61.188622189, 6),
        (61.188622189, -144.538179355, 0),
        (77.781745931, -77.781745931, 0),
        (144.538179355, -61.188622189, 0),
    ]]
    chamfer(chamfer1_edges, length=CHAMFER1_SIZE)

    # Sketch4 → Cut-Extrude4 (cut)
    with BuildSketch(Plane.XY.offset(6)):
        with Locations((0, 31)):
            Circle(SKETCH4_R)
        with Locations((0, -31)):
            Circle(SKETCH4_R)
    extrude(amount=-CUT_EXTRUDE4_DEPTH, mode=Mode.SUBTRACT)


solid = part.part
